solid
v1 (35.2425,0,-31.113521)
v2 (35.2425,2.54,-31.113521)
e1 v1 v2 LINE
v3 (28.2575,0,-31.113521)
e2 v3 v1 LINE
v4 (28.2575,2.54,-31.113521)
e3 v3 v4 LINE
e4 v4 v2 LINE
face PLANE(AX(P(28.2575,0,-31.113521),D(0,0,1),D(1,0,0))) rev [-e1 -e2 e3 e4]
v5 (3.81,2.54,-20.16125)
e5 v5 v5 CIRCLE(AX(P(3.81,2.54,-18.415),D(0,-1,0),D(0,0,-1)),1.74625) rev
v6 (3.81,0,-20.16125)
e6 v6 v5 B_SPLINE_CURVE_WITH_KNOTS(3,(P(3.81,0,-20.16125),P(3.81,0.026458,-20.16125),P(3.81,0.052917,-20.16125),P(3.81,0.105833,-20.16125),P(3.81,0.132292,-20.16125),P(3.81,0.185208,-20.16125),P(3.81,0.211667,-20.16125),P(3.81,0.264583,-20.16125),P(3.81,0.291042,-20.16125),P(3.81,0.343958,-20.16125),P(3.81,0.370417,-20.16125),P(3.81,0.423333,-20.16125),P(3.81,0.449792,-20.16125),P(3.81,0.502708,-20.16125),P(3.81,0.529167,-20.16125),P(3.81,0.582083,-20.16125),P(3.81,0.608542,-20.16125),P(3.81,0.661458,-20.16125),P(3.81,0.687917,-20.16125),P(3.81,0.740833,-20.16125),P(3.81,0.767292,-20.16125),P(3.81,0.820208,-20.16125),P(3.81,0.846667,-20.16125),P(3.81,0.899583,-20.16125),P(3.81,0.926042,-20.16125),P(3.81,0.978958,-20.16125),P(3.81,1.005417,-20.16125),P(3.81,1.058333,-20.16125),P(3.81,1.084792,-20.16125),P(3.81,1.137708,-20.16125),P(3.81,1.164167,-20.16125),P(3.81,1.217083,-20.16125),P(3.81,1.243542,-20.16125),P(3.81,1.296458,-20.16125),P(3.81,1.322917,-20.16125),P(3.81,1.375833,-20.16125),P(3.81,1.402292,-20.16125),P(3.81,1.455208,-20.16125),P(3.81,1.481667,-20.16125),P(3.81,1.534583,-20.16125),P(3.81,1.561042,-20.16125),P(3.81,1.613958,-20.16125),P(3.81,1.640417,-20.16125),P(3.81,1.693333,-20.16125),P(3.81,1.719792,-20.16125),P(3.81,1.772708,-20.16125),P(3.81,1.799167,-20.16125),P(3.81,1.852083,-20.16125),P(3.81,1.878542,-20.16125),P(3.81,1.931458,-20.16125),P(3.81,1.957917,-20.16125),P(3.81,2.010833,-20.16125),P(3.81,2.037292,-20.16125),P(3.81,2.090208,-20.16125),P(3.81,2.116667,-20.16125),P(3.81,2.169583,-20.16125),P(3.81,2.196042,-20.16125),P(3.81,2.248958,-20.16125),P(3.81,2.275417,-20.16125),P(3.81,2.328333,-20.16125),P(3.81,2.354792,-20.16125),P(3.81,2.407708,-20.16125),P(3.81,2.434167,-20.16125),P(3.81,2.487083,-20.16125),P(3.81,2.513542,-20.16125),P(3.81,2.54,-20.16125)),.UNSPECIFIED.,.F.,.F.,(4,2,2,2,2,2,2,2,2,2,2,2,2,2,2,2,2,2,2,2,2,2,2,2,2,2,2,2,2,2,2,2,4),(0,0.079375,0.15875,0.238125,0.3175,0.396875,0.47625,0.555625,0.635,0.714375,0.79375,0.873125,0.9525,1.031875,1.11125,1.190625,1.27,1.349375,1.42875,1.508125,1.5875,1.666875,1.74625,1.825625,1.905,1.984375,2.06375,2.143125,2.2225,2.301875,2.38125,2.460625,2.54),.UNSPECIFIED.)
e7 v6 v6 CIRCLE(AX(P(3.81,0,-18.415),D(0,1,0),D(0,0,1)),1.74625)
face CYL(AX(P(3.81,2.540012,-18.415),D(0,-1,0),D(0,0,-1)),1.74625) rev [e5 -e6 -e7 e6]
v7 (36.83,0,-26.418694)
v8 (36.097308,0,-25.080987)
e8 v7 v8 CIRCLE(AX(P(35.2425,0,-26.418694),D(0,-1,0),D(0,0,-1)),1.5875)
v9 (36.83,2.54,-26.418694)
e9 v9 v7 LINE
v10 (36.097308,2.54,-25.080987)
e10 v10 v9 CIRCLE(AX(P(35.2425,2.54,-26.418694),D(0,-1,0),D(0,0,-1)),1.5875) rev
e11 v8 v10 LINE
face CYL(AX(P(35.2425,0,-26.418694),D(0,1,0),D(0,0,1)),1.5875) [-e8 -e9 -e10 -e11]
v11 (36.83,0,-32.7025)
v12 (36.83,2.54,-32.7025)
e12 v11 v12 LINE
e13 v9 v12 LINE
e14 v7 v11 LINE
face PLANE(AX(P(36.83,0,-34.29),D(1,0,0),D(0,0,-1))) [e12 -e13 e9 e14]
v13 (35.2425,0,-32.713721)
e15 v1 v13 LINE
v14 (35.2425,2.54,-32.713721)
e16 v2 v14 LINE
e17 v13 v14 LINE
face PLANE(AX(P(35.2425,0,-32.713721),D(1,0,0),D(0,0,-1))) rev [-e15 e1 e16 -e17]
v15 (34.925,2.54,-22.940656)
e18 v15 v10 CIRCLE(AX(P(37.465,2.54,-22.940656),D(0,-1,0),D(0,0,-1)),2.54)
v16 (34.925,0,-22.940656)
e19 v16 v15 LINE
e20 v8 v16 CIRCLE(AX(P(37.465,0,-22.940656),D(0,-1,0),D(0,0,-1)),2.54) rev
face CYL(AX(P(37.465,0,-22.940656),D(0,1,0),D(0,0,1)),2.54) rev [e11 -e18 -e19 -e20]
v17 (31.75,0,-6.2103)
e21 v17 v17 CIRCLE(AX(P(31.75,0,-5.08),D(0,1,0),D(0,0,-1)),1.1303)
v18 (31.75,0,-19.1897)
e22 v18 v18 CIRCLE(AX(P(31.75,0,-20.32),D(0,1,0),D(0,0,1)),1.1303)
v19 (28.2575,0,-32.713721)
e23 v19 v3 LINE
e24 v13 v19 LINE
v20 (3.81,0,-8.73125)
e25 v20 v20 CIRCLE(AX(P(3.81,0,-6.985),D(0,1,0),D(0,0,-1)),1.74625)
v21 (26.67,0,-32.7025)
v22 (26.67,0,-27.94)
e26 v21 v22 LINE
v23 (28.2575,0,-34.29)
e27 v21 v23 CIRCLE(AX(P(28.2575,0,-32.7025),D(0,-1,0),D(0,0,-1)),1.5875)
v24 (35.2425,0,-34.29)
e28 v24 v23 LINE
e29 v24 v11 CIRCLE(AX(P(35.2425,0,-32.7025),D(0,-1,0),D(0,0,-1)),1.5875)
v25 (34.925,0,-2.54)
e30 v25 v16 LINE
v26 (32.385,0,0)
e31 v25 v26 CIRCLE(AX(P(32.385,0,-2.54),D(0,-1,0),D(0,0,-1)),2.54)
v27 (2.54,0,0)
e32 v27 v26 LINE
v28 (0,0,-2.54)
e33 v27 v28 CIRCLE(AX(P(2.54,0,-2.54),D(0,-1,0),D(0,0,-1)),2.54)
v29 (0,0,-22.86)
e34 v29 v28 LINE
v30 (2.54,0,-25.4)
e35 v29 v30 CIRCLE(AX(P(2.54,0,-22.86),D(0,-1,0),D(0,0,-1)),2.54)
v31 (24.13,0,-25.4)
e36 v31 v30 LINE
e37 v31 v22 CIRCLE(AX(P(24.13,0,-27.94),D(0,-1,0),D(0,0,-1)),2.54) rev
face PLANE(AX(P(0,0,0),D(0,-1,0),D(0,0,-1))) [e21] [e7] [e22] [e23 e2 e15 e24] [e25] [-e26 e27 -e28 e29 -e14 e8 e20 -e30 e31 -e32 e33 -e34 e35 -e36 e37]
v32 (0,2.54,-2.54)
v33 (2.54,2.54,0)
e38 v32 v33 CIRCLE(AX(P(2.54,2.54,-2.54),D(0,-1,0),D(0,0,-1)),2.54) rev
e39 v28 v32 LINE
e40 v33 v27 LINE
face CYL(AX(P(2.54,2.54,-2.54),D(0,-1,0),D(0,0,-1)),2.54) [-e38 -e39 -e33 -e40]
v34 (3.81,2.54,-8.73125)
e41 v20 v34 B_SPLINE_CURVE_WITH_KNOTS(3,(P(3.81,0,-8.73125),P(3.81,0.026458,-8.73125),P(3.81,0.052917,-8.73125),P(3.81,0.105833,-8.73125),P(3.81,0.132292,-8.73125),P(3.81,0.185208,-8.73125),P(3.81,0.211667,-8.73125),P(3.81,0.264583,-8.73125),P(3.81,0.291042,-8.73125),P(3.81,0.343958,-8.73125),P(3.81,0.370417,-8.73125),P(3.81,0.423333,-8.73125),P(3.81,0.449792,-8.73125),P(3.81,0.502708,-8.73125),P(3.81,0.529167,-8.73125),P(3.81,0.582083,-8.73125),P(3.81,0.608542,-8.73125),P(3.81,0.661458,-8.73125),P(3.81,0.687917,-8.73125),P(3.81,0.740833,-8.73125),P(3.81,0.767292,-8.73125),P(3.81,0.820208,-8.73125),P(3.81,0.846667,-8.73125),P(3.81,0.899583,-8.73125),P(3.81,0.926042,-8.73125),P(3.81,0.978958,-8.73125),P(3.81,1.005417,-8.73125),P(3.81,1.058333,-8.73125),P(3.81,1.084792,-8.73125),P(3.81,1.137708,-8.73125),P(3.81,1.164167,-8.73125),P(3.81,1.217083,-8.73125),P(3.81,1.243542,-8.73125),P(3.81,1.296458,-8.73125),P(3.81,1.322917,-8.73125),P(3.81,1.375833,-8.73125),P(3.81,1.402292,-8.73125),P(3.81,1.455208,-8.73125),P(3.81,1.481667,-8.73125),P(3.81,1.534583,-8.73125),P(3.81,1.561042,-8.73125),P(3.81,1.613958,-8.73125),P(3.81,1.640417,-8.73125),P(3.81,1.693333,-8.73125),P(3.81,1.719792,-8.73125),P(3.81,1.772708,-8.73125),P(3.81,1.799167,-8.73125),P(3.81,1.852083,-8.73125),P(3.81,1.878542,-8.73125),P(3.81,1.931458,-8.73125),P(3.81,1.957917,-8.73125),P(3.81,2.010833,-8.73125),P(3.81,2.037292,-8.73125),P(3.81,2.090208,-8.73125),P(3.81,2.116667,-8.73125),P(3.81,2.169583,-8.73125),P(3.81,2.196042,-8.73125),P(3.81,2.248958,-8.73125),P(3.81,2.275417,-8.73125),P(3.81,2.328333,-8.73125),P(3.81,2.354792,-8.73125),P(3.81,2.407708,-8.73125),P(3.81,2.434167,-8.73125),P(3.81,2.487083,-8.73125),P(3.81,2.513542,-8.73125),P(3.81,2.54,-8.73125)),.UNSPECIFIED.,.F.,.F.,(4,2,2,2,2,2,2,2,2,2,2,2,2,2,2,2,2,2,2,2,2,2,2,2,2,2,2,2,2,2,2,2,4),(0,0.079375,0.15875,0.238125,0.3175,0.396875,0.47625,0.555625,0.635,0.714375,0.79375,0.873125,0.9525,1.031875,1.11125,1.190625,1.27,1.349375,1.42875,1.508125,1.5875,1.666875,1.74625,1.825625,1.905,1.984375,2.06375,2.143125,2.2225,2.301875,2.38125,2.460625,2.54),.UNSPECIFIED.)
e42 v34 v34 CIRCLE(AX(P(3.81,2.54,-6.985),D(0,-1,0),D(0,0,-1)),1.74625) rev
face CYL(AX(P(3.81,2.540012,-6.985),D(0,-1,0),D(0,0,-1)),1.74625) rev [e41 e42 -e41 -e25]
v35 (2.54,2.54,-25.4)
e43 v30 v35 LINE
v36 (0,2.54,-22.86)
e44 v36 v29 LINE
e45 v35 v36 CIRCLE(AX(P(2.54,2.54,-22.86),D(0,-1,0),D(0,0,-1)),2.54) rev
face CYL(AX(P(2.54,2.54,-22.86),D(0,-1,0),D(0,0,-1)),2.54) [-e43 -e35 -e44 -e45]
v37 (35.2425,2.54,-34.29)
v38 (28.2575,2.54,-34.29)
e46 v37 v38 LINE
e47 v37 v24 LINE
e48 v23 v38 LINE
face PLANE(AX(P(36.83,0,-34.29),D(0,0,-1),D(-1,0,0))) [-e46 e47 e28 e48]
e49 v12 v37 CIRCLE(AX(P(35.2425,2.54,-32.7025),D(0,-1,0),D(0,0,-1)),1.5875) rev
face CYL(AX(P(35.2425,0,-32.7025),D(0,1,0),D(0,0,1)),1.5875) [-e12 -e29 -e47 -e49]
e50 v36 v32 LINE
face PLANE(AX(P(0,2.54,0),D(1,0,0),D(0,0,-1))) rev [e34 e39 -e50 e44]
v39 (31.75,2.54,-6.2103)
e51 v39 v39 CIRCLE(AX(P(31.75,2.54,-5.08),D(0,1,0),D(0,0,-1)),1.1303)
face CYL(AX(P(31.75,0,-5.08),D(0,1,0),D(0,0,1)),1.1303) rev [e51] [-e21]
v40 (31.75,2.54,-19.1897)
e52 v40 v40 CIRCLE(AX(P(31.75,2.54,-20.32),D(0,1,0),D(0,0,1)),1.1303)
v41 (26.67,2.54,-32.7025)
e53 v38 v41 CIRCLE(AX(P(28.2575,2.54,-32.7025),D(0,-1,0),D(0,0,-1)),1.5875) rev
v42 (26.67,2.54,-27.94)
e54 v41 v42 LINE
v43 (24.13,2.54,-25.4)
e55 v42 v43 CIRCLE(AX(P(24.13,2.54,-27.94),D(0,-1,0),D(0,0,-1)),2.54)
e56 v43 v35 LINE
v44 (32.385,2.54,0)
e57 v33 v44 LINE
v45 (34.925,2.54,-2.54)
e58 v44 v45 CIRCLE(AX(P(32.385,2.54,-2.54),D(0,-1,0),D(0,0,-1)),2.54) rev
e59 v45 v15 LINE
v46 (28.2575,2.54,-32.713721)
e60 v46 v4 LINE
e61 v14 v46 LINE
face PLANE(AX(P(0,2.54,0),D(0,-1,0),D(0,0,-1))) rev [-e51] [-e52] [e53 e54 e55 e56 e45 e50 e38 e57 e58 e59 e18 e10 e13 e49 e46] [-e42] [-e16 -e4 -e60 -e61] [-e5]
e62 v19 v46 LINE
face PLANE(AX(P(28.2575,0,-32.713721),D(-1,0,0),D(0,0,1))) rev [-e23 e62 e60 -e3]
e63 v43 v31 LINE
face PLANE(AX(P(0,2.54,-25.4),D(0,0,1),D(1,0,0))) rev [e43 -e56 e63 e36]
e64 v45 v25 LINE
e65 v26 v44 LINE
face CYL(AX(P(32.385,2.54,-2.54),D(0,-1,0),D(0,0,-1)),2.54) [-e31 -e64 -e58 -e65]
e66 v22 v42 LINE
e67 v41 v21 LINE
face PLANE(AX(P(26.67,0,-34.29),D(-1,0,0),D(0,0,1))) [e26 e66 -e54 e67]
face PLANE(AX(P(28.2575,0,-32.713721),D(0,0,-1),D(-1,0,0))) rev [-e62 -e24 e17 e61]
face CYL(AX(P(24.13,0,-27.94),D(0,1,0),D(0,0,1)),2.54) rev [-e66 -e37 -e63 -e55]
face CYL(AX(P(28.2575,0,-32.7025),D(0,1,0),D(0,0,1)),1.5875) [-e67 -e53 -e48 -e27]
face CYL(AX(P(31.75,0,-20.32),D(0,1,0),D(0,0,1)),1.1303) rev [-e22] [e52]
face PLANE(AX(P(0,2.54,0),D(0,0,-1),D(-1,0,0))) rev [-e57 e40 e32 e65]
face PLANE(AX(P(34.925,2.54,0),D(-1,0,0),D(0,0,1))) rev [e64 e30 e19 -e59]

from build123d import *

# Parameters (mm, degrees)
SKETCH1_W               = 34.925
SKETCH1_H               = 25.4
BOSS_EXTRUDE1_DEPTH     = 2.54
CUT_EXTRUDE3_DEPTH      = 44.259302179
CUT_EXTRUDE3_DEPTH_BACK = 44.259302179
SKETCH2_R               = 1.74625
SKETCH5_R               = 1.1303
CUT_EXTRUDE4_DEPTH      = 44.259302179
SKETCH6_W               = 10.16
SKETCH6_H               = 8.89
BOSS_EXTRUDE2_DEPTH     = 2.54
SKETCH7_W               = 6.985
SKETCH7_H               = 1.6002
CUT_EXTRUDE5_DEPTH      = 51.385559439
FILLET1_R               = 2.54
FILLET2_R               = 1.5875
FILLET3_R               = 2.54


with BuildPart() as part:
    # Sketch1 → Boss-Extrude1 (new body)
    with BuildSketch(Plane(origin=(0, 0, 0), x_dir=(1, 0, 0), z_dir=(0, 1, 0))):
        with Locations((17.4625, 12.7)):
            Rectangle(SKETCH1_W, SKETCH1_H)
    extrude(amount=BOSS_EXTRUDE1_DEPTH)

    # Sketch2 → Cut-Extrude3 (cut, two sides: drawn at the far end of the back side and taken through both)
    with BuildSketch(Plane(origin=(0, 2.54, 0), x_dir=(1, 0, 0), z_dir=(0, 1, 0)).offset(-CUT_EXTRUDE3_DEPTH_BACK)):
        with Locations(Location((3.81, 18.415, 0), (0, 0, 90))):
            Circle(SKETCH2_R)
        with Locations(Location((3.81, 6.985, 0), (0, 0, 90))):
            Circle(SKETCH2_R)
    extrude(amount=CUT_EXTRUDE3_DEPTH + CUT_EXTRUDE3_DEPTH_BACK, mode=Mode.SUBTRACT)

    # Sketch5 → Cut-Extrude4 (cut, through all)
    with BuildSketch(Plane(origin=(0, 2.54, 0), x_dir=(1, 0, 0), z_dir=(0, 1, 0))):
        with Locations(Location((31.75, 20.32, 0), (0, 0, 270))):
            Circle(SKETCH5_R)
        with Locations(Location((31.75, 5.08, 0), (0, 0, 90))):
            Circle(SKETCH5_R)
    extrude(amount=-CUT_EXTRUDE4_DEPTH, mode=Mode.SUBTRACT)

    # Sketch6 → Boss-Extrude2 (add)
    with BuildSketch(Plane(origin=(0, 2.54, 0), x_dir=(1, 0, 0), z_dir=(0, 1, 0))):
        with Locations((31.75, 29.845)):
            Rectangle(SKETCH6_W, SKETCH6_H)
    extrude(amount=-BOSS_EXTRUDE2_DEPTH)

    # Sketch7 → Cut-Extrude5 (cut, through all)
    with BuildSketch(Plane(origin=(0, 2.54, 0), x_dir=(1, 0, 0), z_dir=(0, 1, 0))):
        with Locations((31.75, 31.913620935)):
            Rectangle(SKETCH7_W, SKETCH7_H)
    extrude(amount=-CUT_EXTRUDE5_DEPTH, mode=Mode.SUBTRACT)

    # Fillet1
    # the kernel refuses this fillet: 2.54 mm, written as the material it adds along each edge
    with BuildSketch(Plane(origin=(26.67, 2.54, -25.4), x_dir=(-1, 0, 0), z_dir=(0, -1, 0))) as fillet1_piece_1:
        with BuildLine():
            CenterArc((FILLET1_R, FILLET1_R), FILLET1_R, 180, 90)
            Line((0, FILLET1_R), (-FILLET1_R * 0.02, FILLET1_R))
            Line((-FILLET1_R * 0.02, FILLET1_R), (-FILLET1_R * 0.02, -FILLET1_R * 0.02))
            Line((-FILLET1_R * 0.02, -FILLET1_R * 0.02), (FILLET1_R, -FILLET1_R * 0.02))
            Line((FILLET1_R, -FILLET1_R * 0.02), (FILLET1_R, 0))
        make_face()
    extrude(amount=2.54)
    with BuildSketch(Plane(origin=(34.925, 0, -25.4), x_dir=(0, 0, 1), z_dir=(0, 1, 0))) as fillet1_piece_2:
        with BuildLine():
            CenterArc((2.459344425, 2.54), FILLET1_R, 194.477512186, 75.522487814)
            Line((0, 1.905), (-0.049186888, 1.8923))
            ThreePointArc((-0.049186888, 1.8923), (-0.0508, 0.9525), (-0.0508, 0))
            Line((-0.0508, 0), (0, -0.0508))
            Line((0, -0.0508), (2.459344425, -0.0508))
            Line((2.459344425, -0.0508), (2.459344425, 0))
        make_face()
    extrude(amount=2.54)

    # Fillet2
    fillet2_edges = [part.edges().sort_by_distance(p)[0] for p in [
        (26.67, 1.27, -34.29),
        (36.83, 1.27, -34.29),
        (36.83, 1.27, -25.4),
    ]]
    fillet(fillet2_edges, radius=FILLET2_R)

    # Fillet3
    fillet3_edges = [part.edges().sort_by_distance(p)[0] for p in [
        (0, 1.27, -25.4),
        (34.925, 1.27, 0),
        (0, 1.27, 0),
    ]]
    fillet(fillet3_edges, radius=FILLET3_R)


solid = part.part
